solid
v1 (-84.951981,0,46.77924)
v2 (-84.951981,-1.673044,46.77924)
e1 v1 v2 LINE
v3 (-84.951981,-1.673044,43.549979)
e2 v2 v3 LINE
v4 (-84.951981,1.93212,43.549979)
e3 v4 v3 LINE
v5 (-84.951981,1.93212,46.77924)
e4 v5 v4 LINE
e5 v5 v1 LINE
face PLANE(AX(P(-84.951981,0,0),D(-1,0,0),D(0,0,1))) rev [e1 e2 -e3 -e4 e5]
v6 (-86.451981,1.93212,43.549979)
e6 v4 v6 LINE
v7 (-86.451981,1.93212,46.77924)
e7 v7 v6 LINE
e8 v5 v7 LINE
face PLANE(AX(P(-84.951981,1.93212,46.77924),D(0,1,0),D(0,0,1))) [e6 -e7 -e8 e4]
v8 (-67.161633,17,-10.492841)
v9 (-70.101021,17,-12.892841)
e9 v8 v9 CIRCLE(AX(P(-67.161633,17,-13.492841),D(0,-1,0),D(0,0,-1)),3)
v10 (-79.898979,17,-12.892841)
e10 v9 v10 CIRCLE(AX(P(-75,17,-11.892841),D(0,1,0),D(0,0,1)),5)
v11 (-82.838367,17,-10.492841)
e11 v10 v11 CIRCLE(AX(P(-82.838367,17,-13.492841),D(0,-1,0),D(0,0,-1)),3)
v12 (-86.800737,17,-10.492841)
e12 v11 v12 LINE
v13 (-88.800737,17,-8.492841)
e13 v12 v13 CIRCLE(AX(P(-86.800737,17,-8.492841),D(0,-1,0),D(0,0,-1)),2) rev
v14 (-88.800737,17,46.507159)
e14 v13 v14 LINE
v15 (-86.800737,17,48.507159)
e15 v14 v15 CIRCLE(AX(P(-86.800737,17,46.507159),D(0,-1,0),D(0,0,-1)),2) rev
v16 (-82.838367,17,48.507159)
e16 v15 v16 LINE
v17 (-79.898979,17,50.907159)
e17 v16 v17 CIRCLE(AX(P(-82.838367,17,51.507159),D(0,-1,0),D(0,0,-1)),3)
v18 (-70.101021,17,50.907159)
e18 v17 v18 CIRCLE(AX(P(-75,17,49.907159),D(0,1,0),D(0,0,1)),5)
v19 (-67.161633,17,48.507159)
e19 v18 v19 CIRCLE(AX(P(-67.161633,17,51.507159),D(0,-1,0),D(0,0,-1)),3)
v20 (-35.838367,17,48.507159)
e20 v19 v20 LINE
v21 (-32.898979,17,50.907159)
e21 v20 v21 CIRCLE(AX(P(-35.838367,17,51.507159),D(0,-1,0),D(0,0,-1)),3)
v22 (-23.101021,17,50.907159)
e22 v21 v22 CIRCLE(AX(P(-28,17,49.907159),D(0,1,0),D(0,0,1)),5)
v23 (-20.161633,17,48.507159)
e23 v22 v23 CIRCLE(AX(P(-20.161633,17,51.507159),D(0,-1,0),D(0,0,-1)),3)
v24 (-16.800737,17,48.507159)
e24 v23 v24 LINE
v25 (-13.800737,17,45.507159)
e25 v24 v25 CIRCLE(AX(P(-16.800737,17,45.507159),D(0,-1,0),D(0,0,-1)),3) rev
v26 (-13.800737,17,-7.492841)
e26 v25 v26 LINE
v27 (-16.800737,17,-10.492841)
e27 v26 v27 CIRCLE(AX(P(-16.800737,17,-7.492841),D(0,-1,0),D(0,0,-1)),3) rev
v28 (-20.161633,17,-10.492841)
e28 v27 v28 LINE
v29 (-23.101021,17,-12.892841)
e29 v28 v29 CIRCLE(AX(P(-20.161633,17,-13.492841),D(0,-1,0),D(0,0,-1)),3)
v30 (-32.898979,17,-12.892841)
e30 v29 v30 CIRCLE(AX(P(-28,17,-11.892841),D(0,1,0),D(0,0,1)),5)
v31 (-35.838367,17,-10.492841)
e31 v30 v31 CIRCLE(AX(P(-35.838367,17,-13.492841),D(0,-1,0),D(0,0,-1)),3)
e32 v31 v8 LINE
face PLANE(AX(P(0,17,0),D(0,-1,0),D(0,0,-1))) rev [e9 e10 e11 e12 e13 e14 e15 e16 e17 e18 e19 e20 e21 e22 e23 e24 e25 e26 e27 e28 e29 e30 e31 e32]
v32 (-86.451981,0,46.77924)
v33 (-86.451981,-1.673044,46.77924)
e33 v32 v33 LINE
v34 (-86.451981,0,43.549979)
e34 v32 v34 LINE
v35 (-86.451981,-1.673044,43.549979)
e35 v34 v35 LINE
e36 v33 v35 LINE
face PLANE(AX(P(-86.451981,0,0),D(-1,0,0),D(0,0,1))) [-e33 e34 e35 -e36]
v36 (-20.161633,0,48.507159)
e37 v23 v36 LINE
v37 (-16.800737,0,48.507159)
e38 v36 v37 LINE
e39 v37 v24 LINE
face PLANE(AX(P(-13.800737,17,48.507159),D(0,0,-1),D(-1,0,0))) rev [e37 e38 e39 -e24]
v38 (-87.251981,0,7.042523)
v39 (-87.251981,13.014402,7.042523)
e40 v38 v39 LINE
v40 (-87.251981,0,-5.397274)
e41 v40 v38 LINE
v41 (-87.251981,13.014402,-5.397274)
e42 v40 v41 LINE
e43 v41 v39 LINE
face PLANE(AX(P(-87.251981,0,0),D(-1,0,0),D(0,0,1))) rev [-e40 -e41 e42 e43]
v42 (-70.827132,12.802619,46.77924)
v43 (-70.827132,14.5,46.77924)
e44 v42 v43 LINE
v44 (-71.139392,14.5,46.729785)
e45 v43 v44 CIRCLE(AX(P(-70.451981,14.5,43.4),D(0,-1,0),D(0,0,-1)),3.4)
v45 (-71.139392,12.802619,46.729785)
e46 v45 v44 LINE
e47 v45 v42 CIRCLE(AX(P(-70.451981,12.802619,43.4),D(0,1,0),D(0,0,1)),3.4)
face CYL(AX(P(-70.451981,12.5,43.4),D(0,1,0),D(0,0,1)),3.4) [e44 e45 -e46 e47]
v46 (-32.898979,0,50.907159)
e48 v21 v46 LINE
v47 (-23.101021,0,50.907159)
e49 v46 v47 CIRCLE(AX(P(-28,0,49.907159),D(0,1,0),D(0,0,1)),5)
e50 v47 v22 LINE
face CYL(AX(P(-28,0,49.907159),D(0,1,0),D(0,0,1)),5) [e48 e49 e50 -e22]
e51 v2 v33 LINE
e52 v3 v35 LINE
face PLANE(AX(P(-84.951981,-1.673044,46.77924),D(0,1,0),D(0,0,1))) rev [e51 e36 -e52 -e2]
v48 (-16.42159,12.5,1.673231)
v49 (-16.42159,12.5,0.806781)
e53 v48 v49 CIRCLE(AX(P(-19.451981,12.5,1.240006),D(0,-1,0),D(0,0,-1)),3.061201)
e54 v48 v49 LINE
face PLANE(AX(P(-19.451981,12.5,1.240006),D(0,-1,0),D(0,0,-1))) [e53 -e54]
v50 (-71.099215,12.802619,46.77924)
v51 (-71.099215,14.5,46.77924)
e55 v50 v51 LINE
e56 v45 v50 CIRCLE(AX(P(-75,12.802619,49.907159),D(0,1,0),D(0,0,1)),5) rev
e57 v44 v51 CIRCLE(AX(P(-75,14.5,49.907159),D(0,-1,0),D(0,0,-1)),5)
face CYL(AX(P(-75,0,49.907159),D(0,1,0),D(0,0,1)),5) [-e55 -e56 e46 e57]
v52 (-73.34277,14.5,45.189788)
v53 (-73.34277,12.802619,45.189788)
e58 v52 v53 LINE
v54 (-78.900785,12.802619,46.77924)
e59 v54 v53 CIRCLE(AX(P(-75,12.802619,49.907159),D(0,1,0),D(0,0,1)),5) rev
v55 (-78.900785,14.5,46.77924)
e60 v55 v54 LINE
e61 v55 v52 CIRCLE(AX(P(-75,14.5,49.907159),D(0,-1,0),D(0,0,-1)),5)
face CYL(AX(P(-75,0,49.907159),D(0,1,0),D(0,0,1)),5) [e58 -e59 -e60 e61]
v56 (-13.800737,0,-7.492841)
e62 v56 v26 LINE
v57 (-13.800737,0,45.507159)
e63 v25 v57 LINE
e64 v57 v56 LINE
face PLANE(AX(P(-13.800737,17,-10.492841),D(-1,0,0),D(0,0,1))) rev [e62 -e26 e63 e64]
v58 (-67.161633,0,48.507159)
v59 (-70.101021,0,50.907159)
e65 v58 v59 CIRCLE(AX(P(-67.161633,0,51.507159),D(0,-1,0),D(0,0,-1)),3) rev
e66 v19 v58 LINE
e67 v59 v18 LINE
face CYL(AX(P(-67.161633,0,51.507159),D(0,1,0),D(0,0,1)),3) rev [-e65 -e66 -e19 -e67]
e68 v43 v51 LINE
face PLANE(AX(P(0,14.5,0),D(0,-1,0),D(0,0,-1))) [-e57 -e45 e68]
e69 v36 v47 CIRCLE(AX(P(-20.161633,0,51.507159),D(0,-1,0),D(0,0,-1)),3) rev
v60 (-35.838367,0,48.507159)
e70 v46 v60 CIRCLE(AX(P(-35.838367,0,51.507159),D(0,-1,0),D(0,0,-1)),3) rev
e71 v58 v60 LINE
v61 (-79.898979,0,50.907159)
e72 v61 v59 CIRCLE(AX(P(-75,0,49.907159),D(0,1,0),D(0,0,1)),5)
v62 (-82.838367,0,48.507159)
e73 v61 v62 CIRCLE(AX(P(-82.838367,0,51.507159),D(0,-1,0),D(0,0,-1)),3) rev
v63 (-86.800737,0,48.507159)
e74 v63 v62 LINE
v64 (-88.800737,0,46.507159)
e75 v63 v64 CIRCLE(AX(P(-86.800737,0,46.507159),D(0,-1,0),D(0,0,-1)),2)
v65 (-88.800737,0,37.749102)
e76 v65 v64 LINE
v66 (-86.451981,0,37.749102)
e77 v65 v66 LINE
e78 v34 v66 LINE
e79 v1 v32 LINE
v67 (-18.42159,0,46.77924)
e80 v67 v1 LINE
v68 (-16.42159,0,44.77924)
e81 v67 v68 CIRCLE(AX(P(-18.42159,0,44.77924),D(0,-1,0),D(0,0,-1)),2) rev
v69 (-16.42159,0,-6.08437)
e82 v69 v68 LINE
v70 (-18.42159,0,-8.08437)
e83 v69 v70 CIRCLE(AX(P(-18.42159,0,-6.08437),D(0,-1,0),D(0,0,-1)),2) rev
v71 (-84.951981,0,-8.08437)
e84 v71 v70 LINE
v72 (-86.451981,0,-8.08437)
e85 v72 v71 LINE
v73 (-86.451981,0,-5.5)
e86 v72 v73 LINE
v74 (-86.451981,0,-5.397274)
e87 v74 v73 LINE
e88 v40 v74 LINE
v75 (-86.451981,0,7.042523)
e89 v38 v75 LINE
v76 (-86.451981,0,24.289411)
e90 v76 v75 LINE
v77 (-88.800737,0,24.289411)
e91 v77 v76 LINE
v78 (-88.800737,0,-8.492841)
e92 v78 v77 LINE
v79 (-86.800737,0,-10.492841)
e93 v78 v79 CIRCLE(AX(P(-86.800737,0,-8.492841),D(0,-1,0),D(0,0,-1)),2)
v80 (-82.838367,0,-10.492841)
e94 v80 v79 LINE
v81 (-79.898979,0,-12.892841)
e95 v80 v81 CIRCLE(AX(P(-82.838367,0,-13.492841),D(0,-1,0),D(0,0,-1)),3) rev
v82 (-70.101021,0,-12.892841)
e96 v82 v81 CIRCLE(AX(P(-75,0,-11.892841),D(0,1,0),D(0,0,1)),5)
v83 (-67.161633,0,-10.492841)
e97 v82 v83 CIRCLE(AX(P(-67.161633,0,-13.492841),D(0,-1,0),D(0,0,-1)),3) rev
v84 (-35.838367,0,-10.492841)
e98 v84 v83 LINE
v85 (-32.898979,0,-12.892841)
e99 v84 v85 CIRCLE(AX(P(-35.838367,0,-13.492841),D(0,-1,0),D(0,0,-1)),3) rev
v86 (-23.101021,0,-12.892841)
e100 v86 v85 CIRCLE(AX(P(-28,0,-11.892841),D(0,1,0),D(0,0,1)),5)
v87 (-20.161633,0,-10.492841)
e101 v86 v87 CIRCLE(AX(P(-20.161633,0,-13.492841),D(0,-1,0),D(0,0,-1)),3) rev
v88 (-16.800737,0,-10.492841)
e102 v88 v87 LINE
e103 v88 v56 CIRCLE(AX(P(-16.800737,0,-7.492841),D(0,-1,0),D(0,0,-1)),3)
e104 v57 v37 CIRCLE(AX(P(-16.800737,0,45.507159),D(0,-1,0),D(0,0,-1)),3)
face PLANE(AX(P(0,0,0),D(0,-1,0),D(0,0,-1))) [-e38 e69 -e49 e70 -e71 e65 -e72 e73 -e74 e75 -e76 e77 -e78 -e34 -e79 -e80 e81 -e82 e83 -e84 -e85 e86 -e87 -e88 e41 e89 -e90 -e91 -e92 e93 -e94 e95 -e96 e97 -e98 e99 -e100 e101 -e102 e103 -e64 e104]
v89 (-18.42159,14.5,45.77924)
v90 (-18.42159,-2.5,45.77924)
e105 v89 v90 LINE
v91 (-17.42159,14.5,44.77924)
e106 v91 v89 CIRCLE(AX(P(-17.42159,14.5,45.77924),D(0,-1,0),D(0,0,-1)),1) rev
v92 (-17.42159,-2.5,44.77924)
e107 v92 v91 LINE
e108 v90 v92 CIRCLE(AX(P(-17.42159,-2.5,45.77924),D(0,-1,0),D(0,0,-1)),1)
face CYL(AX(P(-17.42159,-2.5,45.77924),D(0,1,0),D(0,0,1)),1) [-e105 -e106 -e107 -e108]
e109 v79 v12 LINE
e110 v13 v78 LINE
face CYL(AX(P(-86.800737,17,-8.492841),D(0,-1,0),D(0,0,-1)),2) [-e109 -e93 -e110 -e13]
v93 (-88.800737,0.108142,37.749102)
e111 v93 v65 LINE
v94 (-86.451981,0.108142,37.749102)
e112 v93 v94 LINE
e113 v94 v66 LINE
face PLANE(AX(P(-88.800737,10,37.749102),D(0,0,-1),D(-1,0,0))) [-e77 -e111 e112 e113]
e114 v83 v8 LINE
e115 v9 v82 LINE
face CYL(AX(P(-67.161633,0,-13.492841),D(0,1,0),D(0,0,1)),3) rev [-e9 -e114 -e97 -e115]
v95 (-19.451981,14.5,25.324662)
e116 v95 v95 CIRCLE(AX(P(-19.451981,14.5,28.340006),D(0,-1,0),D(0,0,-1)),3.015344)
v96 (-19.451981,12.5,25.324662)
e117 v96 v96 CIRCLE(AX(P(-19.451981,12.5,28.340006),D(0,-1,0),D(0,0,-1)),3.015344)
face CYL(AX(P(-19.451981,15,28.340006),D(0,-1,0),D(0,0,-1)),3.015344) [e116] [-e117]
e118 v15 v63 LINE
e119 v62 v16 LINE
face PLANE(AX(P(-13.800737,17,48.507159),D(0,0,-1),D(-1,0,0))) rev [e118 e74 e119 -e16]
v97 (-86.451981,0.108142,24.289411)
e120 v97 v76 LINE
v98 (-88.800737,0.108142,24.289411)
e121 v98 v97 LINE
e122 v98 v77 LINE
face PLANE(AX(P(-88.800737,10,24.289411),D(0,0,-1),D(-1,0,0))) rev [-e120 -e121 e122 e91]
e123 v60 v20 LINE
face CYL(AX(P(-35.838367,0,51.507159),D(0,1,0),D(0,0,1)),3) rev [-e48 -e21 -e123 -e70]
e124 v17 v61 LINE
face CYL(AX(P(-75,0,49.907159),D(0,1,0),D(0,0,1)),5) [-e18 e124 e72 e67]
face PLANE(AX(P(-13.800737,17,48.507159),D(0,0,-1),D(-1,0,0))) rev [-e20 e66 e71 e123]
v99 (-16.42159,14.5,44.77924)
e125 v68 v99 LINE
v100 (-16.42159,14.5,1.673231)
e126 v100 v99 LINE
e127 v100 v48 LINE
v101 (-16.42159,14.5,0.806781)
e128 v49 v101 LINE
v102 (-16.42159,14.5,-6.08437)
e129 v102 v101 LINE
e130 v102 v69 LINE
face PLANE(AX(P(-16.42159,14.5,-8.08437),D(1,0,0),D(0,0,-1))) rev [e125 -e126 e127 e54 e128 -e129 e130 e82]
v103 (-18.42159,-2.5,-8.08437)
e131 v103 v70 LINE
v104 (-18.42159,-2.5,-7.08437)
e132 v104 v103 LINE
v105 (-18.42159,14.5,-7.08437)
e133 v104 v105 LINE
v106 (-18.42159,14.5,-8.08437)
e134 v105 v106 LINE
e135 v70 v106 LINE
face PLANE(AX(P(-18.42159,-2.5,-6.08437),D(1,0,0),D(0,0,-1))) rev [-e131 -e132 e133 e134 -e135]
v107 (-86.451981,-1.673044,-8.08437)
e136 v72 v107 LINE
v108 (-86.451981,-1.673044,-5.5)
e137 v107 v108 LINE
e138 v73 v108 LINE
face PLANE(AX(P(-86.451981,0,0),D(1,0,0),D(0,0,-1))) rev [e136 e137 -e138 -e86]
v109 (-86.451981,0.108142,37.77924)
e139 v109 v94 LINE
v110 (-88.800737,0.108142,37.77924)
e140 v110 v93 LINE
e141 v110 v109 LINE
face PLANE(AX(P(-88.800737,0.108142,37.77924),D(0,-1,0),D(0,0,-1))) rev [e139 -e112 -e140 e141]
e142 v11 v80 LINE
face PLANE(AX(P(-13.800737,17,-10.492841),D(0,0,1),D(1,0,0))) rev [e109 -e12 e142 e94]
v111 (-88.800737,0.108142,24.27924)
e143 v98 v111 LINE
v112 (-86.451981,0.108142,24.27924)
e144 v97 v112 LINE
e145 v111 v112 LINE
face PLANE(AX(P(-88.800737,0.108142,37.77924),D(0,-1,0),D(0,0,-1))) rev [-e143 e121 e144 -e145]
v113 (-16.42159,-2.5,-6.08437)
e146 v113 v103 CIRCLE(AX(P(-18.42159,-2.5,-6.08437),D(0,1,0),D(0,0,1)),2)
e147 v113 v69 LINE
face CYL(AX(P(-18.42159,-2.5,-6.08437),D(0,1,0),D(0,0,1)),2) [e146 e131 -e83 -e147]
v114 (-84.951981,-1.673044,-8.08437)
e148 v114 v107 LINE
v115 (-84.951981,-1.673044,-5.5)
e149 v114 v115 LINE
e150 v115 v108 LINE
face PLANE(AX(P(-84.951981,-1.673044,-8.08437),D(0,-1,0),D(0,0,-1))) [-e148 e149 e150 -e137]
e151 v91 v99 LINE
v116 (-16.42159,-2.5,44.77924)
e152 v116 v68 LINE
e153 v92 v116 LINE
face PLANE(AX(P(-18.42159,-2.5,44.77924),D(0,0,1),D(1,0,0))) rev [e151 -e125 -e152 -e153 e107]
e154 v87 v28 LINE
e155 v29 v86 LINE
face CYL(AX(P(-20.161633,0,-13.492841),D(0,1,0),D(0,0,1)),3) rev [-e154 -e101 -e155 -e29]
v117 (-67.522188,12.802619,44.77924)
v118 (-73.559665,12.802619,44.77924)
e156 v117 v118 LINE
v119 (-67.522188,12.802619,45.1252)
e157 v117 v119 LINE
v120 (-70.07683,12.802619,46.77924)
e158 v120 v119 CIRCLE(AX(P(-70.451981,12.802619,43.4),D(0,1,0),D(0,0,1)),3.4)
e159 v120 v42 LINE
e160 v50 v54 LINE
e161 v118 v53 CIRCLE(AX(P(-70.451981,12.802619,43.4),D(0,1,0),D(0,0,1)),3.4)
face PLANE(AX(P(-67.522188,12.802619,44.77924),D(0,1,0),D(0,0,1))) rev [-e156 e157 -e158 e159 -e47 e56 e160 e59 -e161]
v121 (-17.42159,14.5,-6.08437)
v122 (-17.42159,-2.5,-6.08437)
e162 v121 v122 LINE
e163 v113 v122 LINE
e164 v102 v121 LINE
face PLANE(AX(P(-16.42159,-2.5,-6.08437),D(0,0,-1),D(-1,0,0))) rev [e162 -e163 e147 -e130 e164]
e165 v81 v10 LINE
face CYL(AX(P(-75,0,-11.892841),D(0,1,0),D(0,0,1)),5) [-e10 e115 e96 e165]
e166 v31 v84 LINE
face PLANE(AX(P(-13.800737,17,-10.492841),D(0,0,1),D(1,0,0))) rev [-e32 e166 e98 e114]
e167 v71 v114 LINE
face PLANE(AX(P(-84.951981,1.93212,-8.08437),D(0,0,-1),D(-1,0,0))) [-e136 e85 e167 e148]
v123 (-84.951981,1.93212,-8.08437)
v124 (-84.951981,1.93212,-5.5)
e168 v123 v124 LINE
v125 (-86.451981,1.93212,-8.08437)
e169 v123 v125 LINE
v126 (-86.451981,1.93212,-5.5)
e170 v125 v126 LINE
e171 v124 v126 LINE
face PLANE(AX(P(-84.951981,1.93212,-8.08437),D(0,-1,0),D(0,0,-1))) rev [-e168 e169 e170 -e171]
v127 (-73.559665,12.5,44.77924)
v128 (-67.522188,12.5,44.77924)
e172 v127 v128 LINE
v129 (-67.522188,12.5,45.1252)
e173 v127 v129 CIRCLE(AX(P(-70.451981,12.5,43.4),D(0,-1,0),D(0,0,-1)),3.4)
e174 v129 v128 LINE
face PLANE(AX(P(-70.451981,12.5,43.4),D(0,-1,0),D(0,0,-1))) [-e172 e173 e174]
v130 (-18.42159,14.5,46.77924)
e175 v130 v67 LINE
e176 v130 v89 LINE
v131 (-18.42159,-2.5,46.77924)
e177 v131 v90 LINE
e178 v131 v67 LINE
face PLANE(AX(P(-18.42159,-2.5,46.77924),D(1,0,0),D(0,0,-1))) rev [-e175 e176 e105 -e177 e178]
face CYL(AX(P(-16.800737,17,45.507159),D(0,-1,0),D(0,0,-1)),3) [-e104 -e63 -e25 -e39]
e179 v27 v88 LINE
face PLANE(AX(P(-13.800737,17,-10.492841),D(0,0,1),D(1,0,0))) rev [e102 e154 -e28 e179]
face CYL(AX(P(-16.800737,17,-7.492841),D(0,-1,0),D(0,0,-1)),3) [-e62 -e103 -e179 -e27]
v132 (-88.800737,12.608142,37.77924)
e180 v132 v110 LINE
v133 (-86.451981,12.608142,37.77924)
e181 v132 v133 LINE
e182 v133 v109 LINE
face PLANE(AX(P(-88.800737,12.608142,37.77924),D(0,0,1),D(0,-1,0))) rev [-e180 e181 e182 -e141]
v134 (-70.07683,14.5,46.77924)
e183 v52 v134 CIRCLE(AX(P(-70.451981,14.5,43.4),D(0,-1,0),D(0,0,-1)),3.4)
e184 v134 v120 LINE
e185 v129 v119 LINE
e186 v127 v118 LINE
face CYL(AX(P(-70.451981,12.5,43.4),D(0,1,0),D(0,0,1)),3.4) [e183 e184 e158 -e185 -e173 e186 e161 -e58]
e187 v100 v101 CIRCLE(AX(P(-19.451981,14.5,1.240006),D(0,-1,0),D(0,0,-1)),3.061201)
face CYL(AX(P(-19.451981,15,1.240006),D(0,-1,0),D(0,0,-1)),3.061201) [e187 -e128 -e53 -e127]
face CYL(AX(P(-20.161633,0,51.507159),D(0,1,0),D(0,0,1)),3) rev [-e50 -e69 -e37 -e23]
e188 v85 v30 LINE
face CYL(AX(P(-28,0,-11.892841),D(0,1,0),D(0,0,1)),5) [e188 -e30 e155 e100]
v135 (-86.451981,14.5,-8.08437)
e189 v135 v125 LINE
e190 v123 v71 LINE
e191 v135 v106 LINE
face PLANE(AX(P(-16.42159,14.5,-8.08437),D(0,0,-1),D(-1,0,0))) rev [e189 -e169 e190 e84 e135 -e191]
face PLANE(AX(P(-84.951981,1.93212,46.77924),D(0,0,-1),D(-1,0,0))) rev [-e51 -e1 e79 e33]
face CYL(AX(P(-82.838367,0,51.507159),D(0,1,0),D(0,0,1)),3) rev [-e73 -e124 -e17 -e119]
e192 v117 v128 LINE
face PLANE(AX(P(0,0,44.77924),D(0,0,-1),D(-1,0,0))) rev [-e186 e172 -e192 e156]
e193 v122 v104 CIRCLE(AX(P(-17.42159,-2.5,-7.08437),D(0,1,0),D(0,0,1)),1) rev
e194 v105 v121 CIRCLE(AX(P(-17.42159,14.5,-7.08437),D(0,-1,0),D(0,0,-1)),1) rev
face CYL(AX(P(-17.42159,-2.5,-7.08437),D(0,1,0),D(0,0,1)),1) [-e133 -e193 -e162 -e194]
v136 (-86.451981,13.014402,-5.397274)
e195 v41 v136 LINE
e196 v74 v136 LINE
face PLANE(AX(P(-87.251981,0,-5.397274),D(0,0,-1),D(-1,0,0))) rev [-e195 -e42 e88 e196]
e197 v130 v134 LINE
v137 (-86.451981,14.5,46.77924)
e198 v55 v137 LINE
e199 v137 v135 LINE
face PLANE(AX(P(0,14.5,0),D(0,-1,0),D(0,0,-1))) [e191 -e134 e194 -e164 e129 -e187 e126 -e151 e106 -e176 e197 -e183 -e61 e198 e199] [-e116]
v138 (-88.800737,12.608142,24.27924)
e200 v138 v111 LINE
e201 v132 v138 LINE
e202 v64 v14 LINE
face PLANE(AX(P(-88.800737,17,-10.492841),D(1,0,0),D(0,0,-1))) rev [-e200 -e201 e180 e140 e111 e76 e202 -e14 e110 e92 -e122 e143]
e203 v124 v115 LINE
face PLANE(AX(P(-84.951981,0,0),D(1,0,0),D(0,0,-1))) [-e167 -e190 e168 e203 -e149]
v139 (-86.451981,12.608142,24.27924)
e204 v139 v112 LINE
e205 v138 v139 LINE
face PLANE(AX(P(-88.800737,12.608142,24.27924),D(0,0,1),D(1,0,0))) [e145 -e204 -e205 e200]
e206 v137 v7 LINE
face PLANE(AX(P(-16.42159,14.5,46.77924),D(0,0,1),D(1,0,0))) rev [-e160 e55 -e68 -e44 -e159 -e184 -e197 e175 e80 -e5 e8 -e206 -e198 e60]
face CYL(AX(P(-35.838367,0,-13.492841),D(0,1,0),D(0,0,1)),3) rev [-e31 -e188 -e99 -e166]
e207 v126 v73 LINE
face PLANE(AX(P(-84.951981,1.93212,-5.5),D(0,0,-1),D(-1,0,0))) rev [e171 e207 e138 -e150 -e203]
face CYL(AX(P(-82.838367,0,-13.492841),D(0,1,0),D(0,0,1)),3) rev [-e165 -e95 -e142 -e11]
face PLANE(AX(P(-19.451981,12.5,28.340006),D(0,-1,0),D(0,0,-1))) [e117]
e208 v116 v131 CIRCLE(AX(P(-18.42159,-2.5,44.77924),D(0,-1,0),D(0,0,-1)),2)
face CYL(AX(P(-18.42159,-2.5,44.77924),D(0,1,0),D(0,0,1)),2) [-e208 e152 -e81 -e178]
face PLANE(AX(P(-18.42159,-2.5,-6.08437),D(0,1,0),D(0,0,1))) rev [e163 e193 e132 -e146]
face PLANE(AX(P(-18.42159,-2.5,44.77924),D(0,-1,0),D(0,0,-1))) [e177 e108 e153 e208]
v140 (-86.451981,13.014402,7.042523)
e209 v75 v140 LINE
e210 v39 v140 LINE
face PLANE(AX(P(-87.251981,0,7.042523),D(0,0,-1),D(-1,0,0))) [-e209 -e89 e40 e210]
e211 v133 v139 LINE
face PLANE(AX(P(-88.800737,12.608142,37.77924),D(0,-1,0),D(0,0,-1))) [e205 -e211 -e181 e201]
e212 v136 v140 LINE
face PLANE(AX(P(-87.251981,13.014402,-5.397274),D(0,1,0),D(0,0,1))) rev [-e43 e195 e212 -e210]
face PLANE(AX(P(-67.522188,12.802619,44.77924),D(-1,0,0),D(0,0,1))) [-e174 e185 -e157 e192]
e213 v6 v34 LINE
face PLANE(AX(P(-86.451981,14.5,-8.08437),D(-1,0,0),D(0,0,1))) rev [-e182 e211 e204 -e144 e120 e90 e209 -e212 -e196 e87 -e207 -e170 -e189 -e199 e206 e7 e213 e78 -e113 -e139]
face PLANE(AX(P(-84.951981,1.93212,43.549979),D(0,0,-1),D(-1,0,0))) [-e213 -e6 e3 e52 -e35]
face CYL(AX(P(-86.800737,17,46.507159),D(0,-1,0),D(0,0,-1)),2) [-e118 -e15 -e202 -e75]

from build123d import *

# Parameters (mm, degrees)
SKETCH1_W            = 75
SKETCH1_H            = 59
BOSS_EXTRUDE1_DEPTH  = 17
SKETCH2_W            = 70.030390533
SKETCH2_H            = 54.863609995
CUT_EXTRUDE1_DEPTH   = 14.5
FILLET2_R            = 2
FILLET3_R            = 2
FILLET4_R            = 3
FILLET5_R            = 3
FILLET6_R            = 2
FILLET7_R            = 2
SKETCH3_W            = 16.063867443
SKETCH3_H            = 6.760736642
SKETCH3_W_2          = 17.298229076
BOSS_EXTRUDE4_DEPTH  = 1.5
SKETCH4_W            = 16.053106641
SKETCH4_H            = 5.652521888
BOSS_EXTRUDE5_DEPTH  = 1.5
SKETCH5_R            = 5
BOSS_EXTRUDE7_DEPTH  = 17
FILLET8_R            = 3
FILLET9_R            = 3
FILLET10_R           = 3
FILLET11_R           = 3
FILLET12_R           = 3
FILLET13_R           = 3
FILLET14_R           = 3
FILLET15_R           = 3
SKETCH8_R            = 3.4
BOSS_EXTRUDE8_DEPTH  = 2
SKETCH9_W            = 12.808706793
SKETCH9_H            = 4.429846096
CUT_EXTRUDE2_DEPTH   = 2
FILLET16_R           = 2
SKETCH10_W           = 13.5
SKETCH10_H           = 12.5
CUT_EXTRUDE3_DEPTH   = 93.639080666
SKETCH12_R           = 3.015343742
SKETCH12_R_2         = 3.061200892
BOSS_EXTRUDE9_DEPTH  = 2.5
SKETCH13_W           = 14.232082031
SKETCH13_H           = 6.597089722
CUT_EXTRUDE5_DEPTH   = 2
SKETCH14_W           = 10.206840338
SKETCH14_H           = 7.342462146
CUT_EXTRUDE6_DEPTH   = 2
SKETCH15_W           = 11.301995552
SKETCH15_H           = 4.624503131
CUT_EXTRUDE7_DEPTH   = 2
SKETCH17_W           = 12.439796887
SKETCH17_H           = 13.014402488
CUT_EXTRUDE8_DEPTH   = 0.8
SKETCH20_W           = 2.355031091
SKETCH20_H           = 13.45969072
CUT_EXTRUDE9_DEPTH   = 10
SKETCH24_W           = 16.053106641
SKETCH24_H           = 5.652521888
CUT_EXTRUDE10_DEPTH  = 1.5
SKETCH25_W           = 17.298229076
SKETCH25_H           = 6.760736642
CUT_EXTRUDE11_DEPTH  = 1.5
SKETCH26_W           = 16.063867443
SKETCH26_H           = 6.760736642
CUT_EXTRUDE12_DEPTH  = 1.5
SKETCH27_W           = 10.245109275
SKETCH27_H           = 5.404900878
SKETCH27_W_2         = 8.945643237
SKETCH27_H_2         = 7.064717813
CUT_EXTRUDE15_DEPTH  = 1.5
SKETCH29_W           = 59.670840593
SKETCH29_H           = 9.824746357
CUT_EXTRUDE23_DEPTH  = 2.5
SKETCH30_W           = 2.58437015
SKETCH30_H           = 3.605163566
SKETCH30_W_2         = 3.229261283
BOSS_EXTRUDE10_DEPTH = 1.5
BOSS_EXTRUDE12_DEPTH = 17
BOSS_EXTRUDE13_DEPTH = 17
FILLET25_R           = 1
FILLET26_R           = 1


with BuildPart() as part:
    # Sketch1 → Boss-Extrude1 (new body)
    with BuildSketch(Plane(origin=(0, 0, 0), x_dir=(1, 0, 0), z_dir=(0, 1, 0))):
        with Locations((-51.300737228, -19.00715852)):
            Rectangle(SKETCH1_W, SKETCH1_H)
    extrude(amount=BOSS_EXTRUDE1_DEPTH)

    # Sketch2 → Cut-Extrude1 (cut)
    with BuildSketch(Plane(origin=(0, 0, 0), x_dir=(-1, 0, 0), z_dir=(0, -1, 0))):
        with Locations((51.436785652, -19.347434848)):
            Rectangle(SKETCH2_W, SKETCH2_H)
    extrude(amount=-CUT_EXTRUDE1_DEPTH, mode=Mode.SUBTRACT)

    # Fillet2
    fillet2_edges = [part.edges().sort_by_distance(p)[0] for p in [
        (-16.421590385, 7.25, -8.08437015),
    ]]
    fillet(fillet2_edges, radius=FILLET2_R)

    # Fillet3
    fillet3_edges = [part.edges().sort_by_distance(p)[0] for p in [
        (-16.421590385, 7.25, 46.779239845),
    ]]
    fillet(fillet3_edges, radius=FILLET3_R)

    # Fillet4
    fillet4_edges = [part.edges().sort_by_distance(p)[0] for p in [
        (-13.800737228, 8.5, -10.49284148),
    ]]
    fillet(fillet4_edges, radius=FILLET4_R)

    # Fillet5
    fillet5_edges = [part.edges().sort_by_distance(p)[0] for p in [
        (-13.800737228, 8.5, 48.50715852),
    ]]
    fillet(fillet5_edges, radius=FILLET5_R)

    # Fillet6
    fillet6_edges = [part.edges().sort_by_distance(p)[0] for p in [
        (-88.800737228, 8.5, -10.49284148),
    ]]
    fillet(fillet6_edges, radius=FILLET6_R)

    # Fillet7
    fillet7_edges = [part.edges().sort_by_distance(p)[0] for p in [
        (-88.800737228, 8.5, 48.50715852),
    ]]
    fillet(fillet7_edges, radius=FILLET7_R)

    # Sketch3 → Boss-Extrude4 (add)
    with BuildSketch(Plane.XY.offset(-8.08437015)):
        with Locations((-26.453524107, 1.054300918)):
            Rectangle(SKETCH3_W, SKETCH3_H)
        with Locations((-77.80286638, 1.054300918)):
            Rectangle(SKETCH3_W_2, SKETCH3_H)
    extrude(amount=BOSS_EXTRUDE4_DEPTH)

    # Sketch4 → Boss-Extrude5 (add)
    with BuildSketch(Plane(origin=(0, 0, 46.779239845), x_dir=(-1, 0, 0), z_dir=(0, 0, -1))):
        with Locations((55.103314843, -0.060708267)):
            Rectangle(SKETCH4_W, SKETCH4_H)
    extrude(amount=BOSS_EXTRUDE5_DEPTH)

    # Sketch5 → Boss-Extrude7 (add)
    with BuildSketch(Plane(origin=(0, 17, 0), x_dir=(1, 0, 0), z_dir=(0, 1, 0))):
        with Locations((-75, 11.89284148)):
            Circle(SKETCH5_R)
        with Locations((-28, 11.89284148)):
            Circle(SKETCH5_R)
        with Locations((-28, -49.90715852)):
            Circle(SKETCH5_R)
        with Locations((-75, -49.90715852)):
            Circle(SKETCH5_R)
    extrude(amount=-BOSS_EXTRUDE7_DEPTH)

    # Fillet8
    fillet8_edges = [part.edges().sort_by_distance(p)[0] for p in [
        (-32.8, 8.5, 48.50715852),
    ]]
    fillet(fillet8_edges, radius=FILLET8_R)

    # Fillet9
    fillet9_edges = [part.edges().sort_by_distance(p)[0] for p in [
        (-23.2, 8.5, 48.50715852),
    ]]
    fillet(fillet9_edges, radius=FILLET9_R)

    # Fillet10
    fillet10_edges = [part.edges().sort_by_distance(p)[0] for p in [
        (-32.8, 8.5, -10.49284148),
    ]]
    fillet(fillet10_edges, radius=FILLET10_R)

    # Fillet11
    fillet11_edges = [part.edges().sort_by_distance(p)[0] for p in [
        (-23.2, 8.5, -10.49284148),
    ]]
    fillet(fillet11_edges, radius=FILLET11_R)

    # Fillet12
    fillet12_edges = [part.edges().sort_by_distance(p)[0] for p in [
        (-70.2, 8.5, -10.49284148),
    ]]
    fillet(fillet12_edges, radius=FILLET12_R)

    # Fillet13
    fillet13_edges = [part.edges().sort_by_distance(p)[0] for p in [
        (-79.8, 8.5, -10.49284148),
    ]]
    fillet(fillet13_edges, radius=FILLET13_R)

    # Fillet14
    fillet14_edges = [part.edges().sort_by_distance(p)[0] for p in [
        (-79.8, 8.5, 48.50715852),
    ]]
    fillet(fillet14_edges, radius=FILLET14_R)

    # Fillet15
    fillet15_edges = [part.edges().sort_by_distance(p)[0] for p in [
        (-70.2, 8.5, 48.50715852),
    ]]
    fillet(fillet15_edges, radius=FILLET15_R)

    # Sketch8 → Boss-Extrude8 (add)
    with BuildSketch(Plane(origin=(0, 14.5, 0), x_dir=(-1, 0, 0), z_dir=(0, -1, 0))):
        with Locations((70.451980918, -43.4)):
            Circle(SKETCH8_R)
    extrude(amount=BOSS_EXTRUDE8_DEPTH)

    # Sketch9 → Cut-Extrude2 (cut)
    with BuildSketch(Plane(origin=(0, 0, 46.779239845), x_dir=(-1, 0, 0), z_dir=(0, 0, -1))):
        with Locations((73.926541466, 10.587695891)):
            Rectangle(SKETCH9_W, SKETCH9_H)
    extrude(amount=CUT_EXTRUDE2_DEPTH, mode=Mode.SUBTRACT)

    # Fillet16
    # the kernel refuses this fillet: 2 mm, written as the material it takes off along each edge
    with BuildSketch(Plane(origin=(-75, 8.372772843, 49.90715852), x_dir=(0.9477649598196841, 0, 0.31896956114650243), z_dir=(-0.31896956114650243, 0, 0.9477649598196841))) as fillet16_piece_1_section:
        with BuildLine():
            CenterArc((5 - FILLET16_R, -FILLET16_R), FILLET16_R, 0, 90)
            Line((5 - FILLET16_R, 0), (5, 0))
            Line((5, 0), (5, -FILLET16_R))
        make_face()
    fillet16_piece_1 = revolve(axis=Axis((-75, 8.372772843, 49.90715852), (0, 1, 0)), revolution_arc=217.20123952, mode=Mode.PRIVATE)
    fillet16_piece_1 = split(fillet16_piece_1, bisect_by=Plane(origin=(-75, 7.75577909, 46.779239845), z_dir=(0, 0, -1)), keep=Keep.TOP, mode=Mode.PRIVATE)
    add(fillet16_piece_1, mode=Mode.SUBTRACT)

    # Sketch10 → Cut-Extrude3 (cut, through all)
    with BuildSketch(Plane(origin=(-86.451980918, 0, 0), x_dir=(0, 0, -1), z_dir=(1, 0, 0))):
        with Locations((-31.029239845, 6.358142349)):
            Rectangle(SKETCH10_W, SKETCH10_H)
    extrude(amount=-CUT_EXTRUDE3_DEPTH, mode=Mode.SUBTRACT)

    # Sketch12 → Boss-Extrude9 (add)
    with BuildSketch(Plane.XZ.offset(-12.5)):
        with Locations(Location((-19.451980918, 28.340005887, 0), (0, 0, 270))):
            Circle(SKETCH12_R)
        with Locations((-19.451980918, 1.240005887)):
            Circle(SKETCH12_R_2)
    extrude(amount=-BOSS_EXTRUDE9_DEPTH)

    # Sketch13 → Cut-Extrude5 (cut)
    with BuildSketch(Plane(origin=(0, 0, 46.779239845), x_dir=(-1, 0, 0), z_dir=(0, 0, -1))):
        with Locations((28.532879783, 11.201455139)):
            Rectangle(SKETCH13_W, SKETCH13_H)
    extrude(amount=CUT_EXTRUDE5_DEPTH, mode=Mode.SUBTRACT)

    # Sketch14 → Cut-Extrude6 (cut)
    with BuildSketch(Plane.XY.offset(-8.08437015)):
        with Locations((-28.337854921, 10.828768927)):
            Rectangle(SKETCH14_W, SKETCH14_H)
    extrude(amount=CUT_EXTRUDE6_DEPTH, mode=Mode.SUBTRACT)

    # Sketch15 → Cut-Extrude7 (cut)
    with BuildSketch(Plane.XY.offset(-8.08437015)):
        with Locations((-75.453181284, 12.187748435)):
            Rectangle(SKETCH15_W, SKETCH15_H)
    extrude(amount=CUT_EXTRUDE7_DEPTH, mode=Mode.SUBTRACT)

    # Sketch17 → Cut-Extrude8 (cut)
    with BuildSketch(Plane(origin=(-86.451980918, 0, 0), x_dir=(0, 0, -1), z_dir=(1, 0, 0))):
        with Locations((-0.822624341, 6.507201244)):
            Rectangle(SKETCH17_W, SKETCH17_H)
    extrude(amount=-CUT_EXTRUDE8_DEPTH, mode=Mode.SUBTRACT)

    # Sketch20 → Cut-Extrude9 (cut)
    with BuildSketch(Plane.XZ):
        with Locations((-87.623221683, 31.019256527)):
            Rectangle(SKETCH20_W, SKETCH20_H)
    extrude(amount=-CUT_EXTRUDE9_DEPTH, mode=Mode.SUBTRACT)

    # Sketch24 → Cut-Extrude10 (cut)
    with BuildSketch(Plane(origin=(0, 0, 45.279239845), x_dir=(-1, 0, 0), z_dir=(0, 0, -1))):
        with Locations((55.103314843, -0.060708267)):
            Rectangle(SKETCH24_W, SKETCH24_H)
    extrude(amount=-CUT_EXTRUDE10_DEPTH, mode=Mode.SUBTRACT)

    # Sketch25 → Cut-Extrude11 (cut)
    with BuildSketch(Plane.XY.offset(-6.58437015)):
        with Locations((-77.80286638, 1.054300918)):
            Rectangle(SKETCH25_W, SKETCH25_H)
    extrude(amount=-CUT_EXTRUDE11_DEPTH, mode=Mode.SUBTRACT)

    # Sketch26 → Cut-Extrude12 (cut)
    with BuildSketch(Plane.XY.offset(-6.58437015)):
        with Locations((-26.453524107, 1.054300918)):
            Rectangle(SKETCH26_W, SKETCH26_H)
    extrude(amount=-CUT_EXTRUDE12_DEPTH, mode=Mode.SUBTRACT)

    # Sketch27 → Cut-Extrude15 (cut)
    with BuildSketch(Plane.XY.offset(-8.08437015)):
        with Locations((-28.244157388, 6.012393954)):
            Rectangle(SKETCH27_W, SKETCH27_H)
        with Locations((-74.691547802, 7.280418696)):
            Rectangle(SKETCH27_W_2, SKETCH27_H_2)
    extrude(amount=CUT_EXTRUDE15_DEPTH, mode=Mode.SUBTRACT)

    # Sketch29 → Cut-Extrude23 (cut)
    with BuildSketch(Plane(origin=(0, 0, 46.779239845), x_dir=(-1, 0, 0), z_dir=(0, 0, -1))):
        with Locations((52.407440491, 4.047505326)):
            Rectangle(SKETCH29_W, SKETCH29_H)
    extrude(amount=CUT_EXTRUDE23_DEPTH, mode=Mode.SUBTRACT)

    # Sketch30 → Boss-Extrude10 (add)
    with BuildSketch(Plane(origin=(-86.451980918, 0, 0), x_dir=(0, 0, -1), z_dir=(1, 0, 0))):
        with Locations((6.792185075, 0.129538017)):
            Rectangle(SKETCH30_W, SKETCH30_H)
        with Locations((-45.164609204, 0.129538017)):
            Rectangle(SKETCH30_W_2, SKETCH30_H)
    extrude(amount=BOSS_EXTRUDE10_DEPTH)

    # Sketch33 → Boss-Extrude12 (add)
    with BuildSketch(Plane.XZ.offset(-14.5)):
        with BuildLine():
            Line((-18.421590385, 46.779239845), (-18.421590385, 44.779239845))
            Line((-18.421590385, 44.779239845), (-16.421590385, 44.779239845))
            ThreePointArc((-16.421590385, 44.779239845), (-17.007376823, 46.193453407), (-18.421590385, 46.779239845))
        make_face()
    extrude(amount=BOSS_EXTRUDE12_DEPTH)

    # Sketch34 → Boss-Extrude13 (add)
    with BuildSketch(Plane(origin=(0, 14.5, 0), x_dir=(-1, 0, 0), z_dir=(0, -1, 0))):
        with BuildLine():
            Line((16.421590385, 6.08437015), (18.421590385, 6.08437015))
            Line((18.421590385, 6.08437015), (18.421590385, 8.08437015))
            ThreePointArc((18.421590385, 8.08437015), (17.007376823, 7.498583712), (16.421590385, 6.08437015))
        make_face()
    extrude(amount=BOSS_EXTRUDE13_DEPTH)

    # Fillet25
    fillet25_edges = [part.edges().sort_by_distance(p)[0] for p in [
        (-18.421590385, 6, -6.08437015),
    ]]
    fillet(fillet25_edges, radius=FILLET25_R)

    # Fillet26
    fillet26_edges = [part.edges().sort_by_distance(p)[0] for p in [
        (-18.421590385, 6, 44.779239845),
    ]]
    fillet(fillet26_edges, radius=FILLET26_R)


solid = part.part
